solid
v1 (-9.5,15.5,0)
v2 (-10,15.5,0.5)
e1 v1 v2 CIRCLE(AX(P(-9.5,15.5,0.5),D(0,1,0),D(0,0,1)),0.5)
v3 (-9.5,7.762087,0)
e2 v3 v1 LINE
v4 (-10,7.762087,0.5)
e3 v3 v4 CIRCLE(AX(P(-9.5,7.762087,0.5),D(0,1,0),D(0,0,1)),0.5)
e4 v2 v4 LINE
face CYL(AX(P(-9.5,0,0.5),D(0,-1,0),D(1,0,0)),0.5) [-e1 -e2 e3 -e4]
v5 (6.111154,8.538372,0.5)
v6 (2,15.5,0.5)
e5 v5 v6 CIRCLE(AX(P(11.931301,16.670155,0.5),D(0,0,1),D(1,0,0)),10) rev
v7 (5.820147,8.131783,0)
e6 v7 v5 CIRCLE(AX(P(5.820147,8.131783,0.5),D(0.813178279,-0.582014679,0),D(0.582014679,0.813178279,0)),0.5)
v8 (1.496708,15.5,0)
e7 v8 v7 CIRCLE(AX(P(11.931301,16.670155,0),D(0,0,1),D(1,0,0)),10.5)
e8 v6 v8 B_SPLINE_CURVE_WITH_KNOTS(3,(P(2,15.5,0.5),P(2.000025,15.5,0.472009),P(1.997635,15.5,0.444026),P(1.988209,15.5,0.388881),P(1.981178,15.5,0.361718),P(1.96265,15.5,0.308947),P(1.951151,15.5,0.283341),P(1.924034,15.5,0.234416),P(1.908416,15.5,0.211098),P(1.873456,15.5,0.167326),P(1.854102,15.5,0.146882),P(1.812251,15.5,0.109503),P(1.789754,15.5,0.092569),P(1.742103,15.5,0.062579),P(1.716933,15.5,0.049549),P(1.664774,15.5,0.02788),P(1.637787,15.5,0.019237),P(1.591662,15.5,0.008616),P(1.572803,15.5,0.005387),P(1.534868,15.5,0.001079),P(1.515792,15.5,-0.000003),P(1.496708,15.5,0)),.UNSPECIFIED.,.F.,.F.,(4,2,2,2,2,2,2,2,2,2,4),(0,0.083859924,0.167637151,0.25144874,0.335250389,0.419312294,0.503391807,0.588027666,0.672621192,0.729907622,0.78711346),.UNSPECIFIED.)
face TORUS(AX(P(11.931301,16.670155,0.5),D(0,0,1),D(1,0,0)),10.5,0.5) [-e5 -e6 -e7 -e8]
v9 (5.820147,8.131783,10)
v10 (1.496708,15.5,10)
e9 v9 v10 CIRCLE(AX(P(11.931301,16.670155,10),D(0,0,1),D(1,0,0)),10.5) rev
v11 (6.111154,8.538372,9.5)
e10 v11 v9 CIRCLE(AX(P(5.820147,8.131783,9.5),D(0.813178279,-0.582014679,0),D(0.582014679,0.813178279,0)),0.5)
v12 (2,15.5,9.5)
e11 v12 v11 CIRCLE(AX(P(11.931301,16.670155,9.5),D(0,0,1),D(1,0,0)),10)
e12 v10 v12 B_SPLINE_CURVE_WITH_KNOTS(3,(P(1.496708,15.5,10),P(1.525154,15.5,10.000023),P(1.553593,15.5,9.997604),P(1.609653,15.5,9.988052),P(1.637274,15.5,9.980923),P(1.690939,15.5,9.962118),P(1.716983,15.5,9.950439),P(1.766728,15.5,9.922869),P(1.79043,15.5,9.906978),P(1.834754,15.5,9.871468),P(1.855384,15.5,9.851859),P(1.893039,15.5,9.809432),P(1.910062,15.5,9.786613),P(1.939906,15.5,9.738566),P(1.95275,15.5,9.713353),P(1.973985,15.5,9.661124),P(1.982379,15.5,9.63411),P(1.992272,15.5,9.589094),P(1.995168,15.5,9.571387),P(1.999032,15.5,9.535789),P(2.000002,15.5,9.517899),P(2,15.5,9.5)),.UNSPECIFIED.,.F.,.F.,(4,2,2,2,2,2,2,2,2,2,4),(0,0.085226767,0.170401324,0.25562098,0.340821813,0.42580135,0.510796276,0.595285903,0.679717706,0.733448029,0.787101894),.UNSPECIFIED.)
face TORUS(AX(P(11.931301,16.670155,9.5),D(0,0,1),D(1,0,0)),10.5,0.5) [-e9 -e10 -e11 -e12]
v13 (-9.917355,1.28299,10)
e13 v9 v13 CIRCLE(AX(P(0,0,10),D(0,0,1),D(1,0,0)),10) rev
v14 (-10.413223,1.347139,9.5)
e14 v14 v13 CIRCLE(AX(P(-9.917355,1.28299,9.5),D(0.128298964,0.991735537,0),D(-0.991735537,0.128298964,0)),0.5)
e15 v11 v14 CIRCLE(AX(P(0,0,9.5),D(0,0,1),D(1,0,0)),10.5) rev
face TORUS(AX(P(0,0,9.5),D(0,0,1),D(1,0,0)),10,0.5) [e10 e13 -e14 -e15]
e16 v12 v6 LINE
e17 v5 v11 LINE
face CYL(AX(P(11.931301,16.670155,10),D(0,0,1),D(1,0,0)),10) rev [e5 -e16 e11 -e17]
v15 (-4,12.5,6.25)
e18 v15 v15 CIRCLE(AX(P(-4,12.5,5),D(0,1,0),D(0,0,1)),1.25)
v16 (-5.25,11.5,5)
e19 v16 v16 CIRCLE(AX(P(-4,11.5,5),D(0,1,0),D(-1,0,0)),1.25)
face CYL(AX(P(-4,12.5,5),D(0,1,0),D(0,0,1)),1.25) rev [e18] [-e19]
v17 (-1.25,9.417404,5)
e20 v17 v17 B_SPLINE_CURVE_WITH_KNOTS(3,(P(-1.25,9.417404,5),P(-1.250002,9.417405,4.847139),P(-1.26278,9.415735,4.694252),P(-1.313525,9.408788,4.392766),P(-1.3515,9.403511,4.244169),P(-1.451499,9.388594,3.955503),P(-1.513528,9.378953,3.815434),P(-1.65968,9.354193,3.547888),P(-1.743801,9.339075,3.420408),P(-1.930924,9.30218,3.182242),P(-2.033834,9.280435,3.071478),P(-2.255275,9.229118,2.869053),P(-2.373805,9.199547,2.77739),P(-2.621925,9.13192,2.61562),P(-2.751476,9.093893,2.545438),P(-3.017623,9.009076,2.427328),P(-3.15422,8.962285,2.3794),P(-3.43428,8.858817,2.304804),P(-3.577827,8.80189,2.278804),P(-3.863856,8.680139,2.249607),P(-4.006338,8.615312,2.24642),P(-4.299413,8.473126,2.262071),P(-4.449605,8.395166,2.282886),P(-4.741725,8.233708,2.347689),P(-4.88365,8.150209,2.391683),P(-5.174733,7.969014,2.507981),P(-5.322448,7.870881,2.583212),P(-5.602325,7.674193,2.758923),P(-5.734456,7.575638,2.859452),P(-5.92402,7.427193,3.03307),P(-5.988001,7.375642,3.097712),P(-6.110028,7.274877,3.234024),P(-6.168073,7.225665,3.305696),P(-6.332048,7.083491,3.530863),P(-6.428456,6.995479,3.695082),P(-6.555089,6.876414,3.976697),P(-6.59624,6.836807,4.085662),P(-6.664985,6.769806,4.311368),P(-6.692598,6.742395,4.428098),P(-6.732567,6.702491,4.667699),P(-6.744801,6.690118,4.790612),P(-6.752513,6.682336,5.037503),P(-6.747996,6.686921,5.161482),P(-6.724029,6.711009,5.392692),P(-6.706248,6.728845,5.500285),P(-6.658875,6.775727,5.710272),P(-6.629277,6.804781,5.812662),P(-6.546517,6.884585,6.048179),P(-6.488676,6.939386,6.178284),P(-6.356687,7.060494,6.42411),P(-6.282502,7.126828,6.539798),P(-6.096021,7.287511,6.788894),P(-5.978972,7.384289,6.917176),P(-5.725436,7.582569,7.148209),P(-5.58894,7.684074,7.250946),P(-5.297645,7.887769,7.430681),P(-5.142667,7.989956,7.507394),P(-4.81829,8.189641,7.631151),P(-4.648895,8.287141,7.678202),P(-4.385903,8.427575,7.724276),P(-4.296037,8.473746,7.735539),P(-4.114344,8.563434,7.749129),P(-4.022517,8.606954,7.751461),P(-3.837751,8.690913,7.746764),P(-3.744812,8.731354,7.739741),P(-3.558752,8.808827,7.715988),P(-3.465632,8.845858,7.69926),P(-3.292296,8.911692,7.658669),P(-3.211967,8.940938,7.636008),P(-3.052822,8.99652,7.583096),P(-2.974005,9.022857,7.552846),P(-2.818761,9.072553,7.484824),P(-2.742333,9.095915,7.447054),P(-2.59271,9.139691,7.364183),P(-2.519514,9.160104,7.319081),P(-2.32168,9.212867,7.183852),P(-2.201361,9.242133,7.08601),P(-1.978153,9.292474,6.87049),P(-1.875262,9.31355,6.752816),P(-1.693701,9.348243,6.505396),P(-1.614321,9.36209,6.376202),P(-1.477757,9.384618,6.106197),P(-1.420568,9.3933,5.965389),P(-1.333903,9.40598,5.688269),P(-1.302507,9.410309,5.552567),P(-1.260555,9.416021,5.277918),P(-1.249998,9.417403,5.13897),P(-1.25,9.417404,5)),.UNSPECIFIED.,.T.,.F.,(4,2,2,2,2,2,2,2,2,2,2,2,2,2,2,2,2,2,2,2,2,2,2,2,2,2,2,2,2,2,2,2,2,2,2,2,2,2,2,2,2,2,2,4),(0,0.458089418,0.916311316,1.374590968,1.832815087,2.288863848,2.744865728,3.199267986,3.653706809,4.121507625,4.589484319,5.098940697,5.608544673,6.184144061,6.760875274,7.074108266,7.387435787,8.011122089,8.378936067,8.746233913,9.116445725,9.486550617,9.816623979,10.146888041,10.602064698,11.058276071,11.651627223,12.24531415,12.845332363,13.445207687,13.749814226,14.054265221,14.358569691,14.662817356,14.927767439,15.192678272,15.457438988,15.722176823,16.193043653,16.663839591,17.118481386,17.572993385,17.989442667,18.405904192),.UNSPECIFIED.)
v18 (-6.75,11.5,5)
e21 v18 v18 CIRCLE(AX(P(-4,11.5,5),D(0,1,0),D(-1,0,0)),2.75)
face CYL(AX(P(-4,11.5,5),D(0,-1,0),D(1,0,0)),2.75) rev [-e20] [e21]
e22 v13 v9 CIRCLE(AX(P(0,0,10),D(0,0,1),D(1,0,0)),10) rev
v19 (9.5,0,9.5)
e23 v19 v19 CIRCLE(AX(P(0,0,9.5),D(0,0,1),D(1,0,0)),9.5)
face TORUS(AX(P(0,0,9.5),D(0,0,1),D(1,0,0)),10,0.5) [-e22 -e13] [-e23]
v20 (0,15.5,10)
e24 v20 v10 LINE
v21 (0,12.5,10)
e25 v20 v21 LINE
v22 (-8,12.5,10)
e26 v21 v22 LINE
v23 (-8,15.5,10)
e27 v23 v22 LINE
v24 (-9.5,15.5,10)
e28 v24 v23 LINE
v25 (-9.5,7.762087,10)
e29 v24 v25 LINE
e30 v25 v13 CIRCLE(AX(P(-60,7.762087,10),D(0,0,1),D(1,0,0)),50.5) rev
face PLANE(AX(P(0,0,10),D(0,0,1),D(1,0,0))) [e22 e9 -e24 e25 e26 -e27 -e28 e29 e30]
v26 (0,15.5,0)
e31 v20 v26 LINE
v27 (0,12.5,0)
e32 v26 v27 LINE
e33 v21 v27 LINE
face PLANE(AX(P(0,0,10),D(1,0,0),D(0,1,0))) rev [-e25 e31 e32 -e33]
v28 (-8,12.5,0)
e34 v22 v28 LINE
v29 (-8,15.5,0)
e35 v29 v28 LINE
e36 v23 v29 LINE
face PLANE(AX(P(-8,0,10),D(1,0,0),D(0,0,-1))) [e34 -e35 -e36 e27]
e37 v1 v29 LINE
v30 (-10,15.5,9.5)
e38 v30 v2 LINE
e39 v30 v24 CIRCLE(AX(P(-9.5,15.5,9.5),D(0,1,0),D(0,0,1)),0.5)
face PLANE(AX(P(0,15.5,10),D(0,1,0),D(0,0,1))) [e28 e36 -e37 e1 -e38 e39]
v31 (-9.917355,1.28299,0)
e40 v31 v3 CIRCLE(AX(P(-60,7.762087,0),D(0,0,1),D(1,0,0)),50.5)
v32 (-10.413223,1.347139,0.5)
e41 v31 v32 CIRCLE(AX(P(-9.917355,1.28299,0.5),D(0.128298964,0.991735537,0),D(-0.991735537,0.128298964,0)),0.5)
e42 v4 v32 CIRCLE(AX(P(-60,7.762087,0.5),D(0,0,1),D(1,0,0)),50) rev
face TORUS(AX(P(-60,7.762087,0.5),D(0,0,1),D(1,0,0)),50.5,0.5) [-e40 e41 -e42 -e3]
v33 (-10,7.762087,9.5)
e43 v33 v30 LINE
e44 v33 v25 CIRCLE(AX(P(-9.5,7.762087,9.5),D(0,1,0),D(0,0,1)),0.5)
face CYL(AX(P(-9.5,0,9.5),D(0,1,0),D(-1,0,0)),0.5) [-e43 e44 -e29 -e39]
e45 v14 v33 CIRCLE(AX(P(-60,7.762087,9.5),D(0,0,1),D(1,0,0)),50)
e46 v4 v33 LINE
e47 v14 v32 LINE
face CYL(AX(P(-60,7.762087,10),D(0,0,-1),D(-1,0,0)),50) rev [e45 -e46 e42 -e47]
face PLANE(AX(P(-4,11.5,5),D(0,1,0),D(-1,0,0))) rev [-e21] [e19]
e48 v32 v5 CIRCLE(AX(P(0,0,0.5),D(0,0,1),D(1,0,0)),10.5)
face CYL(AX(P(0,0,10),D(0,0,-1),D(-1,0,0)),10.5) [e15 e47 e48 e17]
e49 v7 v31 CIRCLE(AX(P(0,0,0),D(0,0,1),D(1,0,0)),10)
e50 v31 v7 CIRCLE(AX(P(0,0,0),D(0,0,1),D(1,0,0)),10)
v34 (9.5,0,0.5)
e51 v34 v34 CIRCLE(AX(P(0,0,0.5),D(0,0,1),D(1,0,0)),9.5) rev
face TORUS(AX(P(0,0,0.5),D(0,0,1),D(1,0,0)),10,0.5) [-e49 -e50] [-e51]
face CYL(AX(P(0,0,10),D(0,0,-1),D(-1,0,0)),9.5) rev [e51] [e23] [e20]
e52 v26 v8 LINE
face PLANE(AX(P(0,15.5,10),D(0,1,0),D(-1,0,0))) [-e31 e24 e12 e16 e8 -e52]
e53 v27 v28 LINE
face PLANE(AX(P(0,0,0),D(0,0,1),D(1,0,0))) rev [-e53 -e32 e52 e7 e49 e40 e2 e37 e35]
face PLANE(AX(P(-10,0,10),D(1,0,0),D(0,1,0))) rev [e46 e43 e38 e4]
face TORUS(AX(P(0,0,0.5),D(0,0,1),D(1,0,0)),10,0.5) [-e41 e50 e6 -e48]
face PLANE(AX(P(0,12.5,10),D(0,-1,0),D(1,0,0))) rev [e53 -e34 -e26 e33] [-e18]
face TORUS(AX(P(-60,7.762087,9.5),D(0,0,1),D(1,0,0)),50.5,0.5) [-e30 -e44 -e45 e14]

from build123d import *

# Parameters (mm, degrees)
SKETCH1_R              = 10.5
SKETCH1_R_2            = 9.5
BOSS_EXTRUDE1_DEPTH    = 10
FILLET1_R              = 50
FILLET2_R              = 10
M3_TAPPED_HOLE1_REACH  = 29.189
M3_TAPPED_HOLE1_BORE_R = 1.25
FILLET3_SIZE           = 0.5
CUT_EXTRUDE1_START     = 9
SKETCH4_R              = 2.75
SKETCH4_R_2            = 1.25
CUT_EXTRUDE1_DEPTH     = 9


with BuildPart() as part:
    # Sketch1 → Boss-Extrude1 (new body)
    # profile 1 of 2: a face of its own
    with BuildSketch(Plane.XY):
        with BuildLine():
            Line((-8, 15.5), (-10, 15.5))
            Line((-10, 15.5), (-10, 3.201562119))
            ThreePointArc((-10, 3.201562119), (-5.350189391, 9.034681703), (2, 10.307764064))
            Line((2, 10.307764064), (2, 15.5))
            Line((2, 15.5), (0, 15.5))
            Line((0, 15.5), (0, 12.5))
            Line((0, 12.5), (-8, 12.5))
            Line((-8, 12.5), (-8, 15.5))
        make_face()
    # profile 2 of 2: a face of its own
    with BuildSketch(Plane.XY):
        Circle(SKETCH1_R)
        Circle(SKETCH1_R_2, mode=Mode.SUBTRACT)
    extrude(amount=BOSS_EXTRUDE1_DEPTH)

    # Fillet1
    fillet1_edges = [part.edges().sort_by_distance(p)[0] for p in [
        (-10, 3.201562119, 5),
    ]]
    fillet(fillet1_edges, radius=FILLET1_R)

    # Fillet2
    # the kernel refuses this fillet: 10 mm, written as the material it adds along each edge
    with BuildSketch(Plane(origin=(2, 10.307764064, 0), x_dir=(0.9185397439209221, -0.39532864661909706, 0), z_dir=(0, 0, 1))) as fillet2_piece_1:
        with BuildLine():
            CenterArc((6.607059315, 9.770236435), FILLET2_R, 210.006360565, 47.687742379)
            Line((-2.052639605, 4.769275067), (-2.225833584, 4.66925584))
            ThreePointArc((-2.225833584, 4.66925584), (-1.210027752, 2.305571804), (-0.183707949, -0.079065729))
            Line((-0.183707949, -0.079065729), (0.042626189, -0.195404729))
            ThreePointArc((0.042626189, -0.195404729), (2.237874929, 0.041251743), (4.433123669, -0.195404729))
            Line((4.433123669, -0.195404729), (4.475749859, 0))
        make_face()
    extrude(amount=10)

    # M3 Tapped Hole1 bore → M3 Tapped Hole1 (cut, up to next)
    with BuildSketch(Plane(origin=(0, 12.5, 0), x_dir=(1, 0, 0), z_dir=(0, 1, 0)), mode=Mode.PRIVATE) as m3_tapped_hole1_sk1:
        with Locations((-4, -5)):
            Circle(M3_TAPPED_HOLE1_BORE_R)
    m3_tapped_hole1_tool1 = extrude(m3_tapped_hole1_sk1.sketch, amount=-M3_TAPPED_HOLE1_REACH, mode=Mode.PRIVATE) & part.part
    add(m3_tapped_hole1_tool1.solids().sort_by_distance((-4, 12.5, 5))[0], mode=Mode.SUBTRACT)

    # Fillet3
    # a fillet whose section is not a circle: 0.5 mm, written as the material it takes off along each edge
    with BuildSketch(Plane(origin=(0, 0, 0), x_dir=(1, 0, 0), z_dir=(0, -1, 0))) as fillet3_piece_1:
        with BuildLine():
            Bezier((9.5 + FILLET3_SIZE, 0), (9.5, 0), (9.5, FILLET3_SIZE), weights=[1, 0.707106781, 1])
            Line((9.5, FILLET3_SIZE), (9.5, 0))
            Line((9.5, 0), (9.5 + FILLET3_SIZE, 0))
        make_face()
    revolve(axis=Axis((0, 0, 0), (0, 0, 1)), mode=Mode.SUBTRACT)
    with BuildSketch(Plane(origin=(-10, 16.75, 0), x_dir=(1, 0, 0), z_dir=(0, -1, 0))) as fillet3_piece_2:
        with BuildLine():
            Bezier((FILLET3_SIZE, 0), (0, 0), (0, FILLET3_SIZE), weights=[1, 0.707106781, 1])
            Line((0, FILLET3_SIZE), (0, 0))
            Line((0, 0), (FILLET3_SIZE, 0))
        make_face()
    extrude(amount=8.987912652, mode=Mode.SUBTRACT)
    with BuildSketch(Plane(origin=(0, 0, 0), x_dir=(-0.9917355371900827, 0.12829896443190072, 0), z_dir=(0.12829896443190072, 0.9917355371900827, 0))) as fillet3_piece_3:
        with BuildLine():
            Bezier((10.5, FILLET3_SIZE), (10.5, 0), (10.5 - FILLET3_SIZE, 0), weights=[1, 0.707106781, 1])
            Line((10.5 - FILLET3_SIZE, 0), (10.5, 0))
            Line((10.5, 0), (10.5, FILLET3_SIZE))
        make_face()
    revolve(axis=Axis((0, 0, 0), (0, 0, 1)), revolution_arc=241.77893748, mode=Mode.SUBTRACT)
    with BuildSketch(Plane(origin=(0, 0, 10), x_dir=(0.5820146789437495, 0.8131782790348032, 0), z_dir=(-0.8131782790348032, 0.5820146789437495, 0))) as fillet3_piece_4:
        with BuildLine():
            Bezier((10.5, FILLET3_SIZE), (10.5, 0), (10.5 - FILLET3_SIZE, 0), weights=[1, 0.707106781, 1])
            Line((10.5 - FILLET3_SIZE, 0), (10.5, 0))
            Line((10.5, 0), (10.5, FILLET3_SIZE))
        make_face()
    revolve(axis=Axis((0, 0, 10), (0, 0, -1)), revolution_arc=241.77893748, mode=Mode.SUBTRACT)
    with BuildSketch(Plane(origin=(-60, 7.762087348, 0), x_dir=(0.9917355371900826, -0.1282989644319008, 0), z_dir=(-0.1282989644319008, -0.9917355371900826, 0))) as fillet3_piece_5:
        with BuildLine():
            Bezier((50 + FILLET3_SIZE, 0), (50, 0), (50, FILLET3_SIZE), weights=[1, 0.707106781, 1])
            Line((50, FILLET3_SIZE), (50, 0))
            Line((50, 0), (50 + FILLET3_SIZE, 0))
        make_face()
    revolve(axis=Axis((-60, 7.762087348, 0), (0, 0, 1)), revolution_arc=7.371307019, mode=Mode.SUBTRACT)
    with BuildSketch(Plane(origin=(-60, 7.762087348, 10), x_dir=(0.9917355371900826, -0.1282989644319008, 0), z_dir=(-0.1282989644319008, -0.9917355371900826, 0))) as fillet3_piece_6:
        with BuildLine():
            Bezier((50 + FILLET3_SIZE, 0), (50, 0), (50, -FILLET3_SIZE), weights=[1, 0.707106781, 1])
            Line((50, -FILLET3_SIZE), (50, 0))
            Line((50, 0), (50 + FILLET3_SIZE, 0))
        make_face()
    revolve(axis=Axis((-60, 7.762087348, 10), (0, 0, 1)), revolution_arc=7.371307019, mode=Mode.SUBTRACT)
    with BuildSketch(Plane(origin=(11.931300918, 16.67015472, 0), x_dir=(-0.999970124297953, 0.0077298455053398385, 0), z_dir=(0.0077298455053398385, 0.999970124297953, 0))) as fillet3_piece_7:
        with BuildLine():
            Bezier((10, FILLET3_SIZE), (10, 0), (10 + FILLET3_SIZE, 0), weights=[1, 0.707106781, 1])
            Line((10 + FILLET3_SIZE, 0), (10, 0))
            Line((10, 0), (10, FILLET3_SIZE))
        make_face()
    revolve(axis=Axis((11.931300918, 16.67015472, 0), (0, 0, 1)), revolution_arc=54.850522395, mode=Mode.SUBTRACT)
    with BuildSketch(Plane(origin=(11.931300918, 16.67015472, 10), x_dir=(-0.999970124297953, 0.0077298455053398385, 0), z_dir=(0.0077298455053398385, 0.999970124297953, 0))) as fillet3_piece_8:
        with BuildLine():
            Bezier((10, -FILLET3_SIZE), (10, 0), (10 + FILLET3_SIZE, 0), weights=[1, 0.707106781, 1])
            Line((10 + FILLET3_SIZE, 0), (10, 0))
            Line((10, 0), (10, -FILLET3_SIZE))
        make_face()
    revolve(axis=Axis((11.931300918, 16.67015472, 10), (0, 0, 1)), revolution_arc=54.850522395, mode=Mode.SUBTRACT)
    with BuildSketch(Plane(origin=(0, 0, 10), x_dir=(1, 0, 0), z_dir=(0, -1, 0))) as fillet3_piece_9:
        with BuildLine():
            Bezier((9.5 + FILLET3_SIZE, 0), (9.5, 0), (9.5, -FILLET3_SIZE), weights=[1, 0.707106781, 1])
            Line((9.5, -FILLET3_SIZE), (9.5, 0))
            Line((9.5, 0), (9.5 + FILLET3_SIZE, 0))
        make_face()
    revolve(axis=Axis((0, 0, 10), (0, 0, 1)), mode=Mode.SUBTRACT)
    with BuildSketch(Plane(origin=(-10, 16.75, 10), x_dir=(1, 0, 0), z_dir=(0, -1, 0))) as fillet3_piece_10:
        with BuildLine():
            Bezier((FILLET3_SIZE, 0), (0, 0), (0, -FILLET3_SIZE), weights=[1, 0.707106781, 1])
            Line((0, -FILLET3_SIZE), (0, 0))
            Line((0, 0), (FILLET3_SIZE, 0))
        make_face()
    extrude(amount=8.987912652, mode=Mode.SUBTRACT)

    # Sketch4 → Cut-Extrude1 (cut)
    with BuildSketch(Plane(origin=(0, 2.5, 0), x_dir=(1, 0, 0), z_dir=(0, 1, 0)).offset(CUT_EXTRUDE1_START)):
        with Locations((-4, -5)):
            Circle(SKETCH4_R)
        with Locations(Location((-4, -5, 0), (0, 0, 270))):
            Circle(SKETCH4_R_2, mode=Mode.SUBTRACT)
    extrude(amount=-CUT_EXTRUDE1_DEPTH, mode=Mode.SUBTRACT)


solid = part.part
